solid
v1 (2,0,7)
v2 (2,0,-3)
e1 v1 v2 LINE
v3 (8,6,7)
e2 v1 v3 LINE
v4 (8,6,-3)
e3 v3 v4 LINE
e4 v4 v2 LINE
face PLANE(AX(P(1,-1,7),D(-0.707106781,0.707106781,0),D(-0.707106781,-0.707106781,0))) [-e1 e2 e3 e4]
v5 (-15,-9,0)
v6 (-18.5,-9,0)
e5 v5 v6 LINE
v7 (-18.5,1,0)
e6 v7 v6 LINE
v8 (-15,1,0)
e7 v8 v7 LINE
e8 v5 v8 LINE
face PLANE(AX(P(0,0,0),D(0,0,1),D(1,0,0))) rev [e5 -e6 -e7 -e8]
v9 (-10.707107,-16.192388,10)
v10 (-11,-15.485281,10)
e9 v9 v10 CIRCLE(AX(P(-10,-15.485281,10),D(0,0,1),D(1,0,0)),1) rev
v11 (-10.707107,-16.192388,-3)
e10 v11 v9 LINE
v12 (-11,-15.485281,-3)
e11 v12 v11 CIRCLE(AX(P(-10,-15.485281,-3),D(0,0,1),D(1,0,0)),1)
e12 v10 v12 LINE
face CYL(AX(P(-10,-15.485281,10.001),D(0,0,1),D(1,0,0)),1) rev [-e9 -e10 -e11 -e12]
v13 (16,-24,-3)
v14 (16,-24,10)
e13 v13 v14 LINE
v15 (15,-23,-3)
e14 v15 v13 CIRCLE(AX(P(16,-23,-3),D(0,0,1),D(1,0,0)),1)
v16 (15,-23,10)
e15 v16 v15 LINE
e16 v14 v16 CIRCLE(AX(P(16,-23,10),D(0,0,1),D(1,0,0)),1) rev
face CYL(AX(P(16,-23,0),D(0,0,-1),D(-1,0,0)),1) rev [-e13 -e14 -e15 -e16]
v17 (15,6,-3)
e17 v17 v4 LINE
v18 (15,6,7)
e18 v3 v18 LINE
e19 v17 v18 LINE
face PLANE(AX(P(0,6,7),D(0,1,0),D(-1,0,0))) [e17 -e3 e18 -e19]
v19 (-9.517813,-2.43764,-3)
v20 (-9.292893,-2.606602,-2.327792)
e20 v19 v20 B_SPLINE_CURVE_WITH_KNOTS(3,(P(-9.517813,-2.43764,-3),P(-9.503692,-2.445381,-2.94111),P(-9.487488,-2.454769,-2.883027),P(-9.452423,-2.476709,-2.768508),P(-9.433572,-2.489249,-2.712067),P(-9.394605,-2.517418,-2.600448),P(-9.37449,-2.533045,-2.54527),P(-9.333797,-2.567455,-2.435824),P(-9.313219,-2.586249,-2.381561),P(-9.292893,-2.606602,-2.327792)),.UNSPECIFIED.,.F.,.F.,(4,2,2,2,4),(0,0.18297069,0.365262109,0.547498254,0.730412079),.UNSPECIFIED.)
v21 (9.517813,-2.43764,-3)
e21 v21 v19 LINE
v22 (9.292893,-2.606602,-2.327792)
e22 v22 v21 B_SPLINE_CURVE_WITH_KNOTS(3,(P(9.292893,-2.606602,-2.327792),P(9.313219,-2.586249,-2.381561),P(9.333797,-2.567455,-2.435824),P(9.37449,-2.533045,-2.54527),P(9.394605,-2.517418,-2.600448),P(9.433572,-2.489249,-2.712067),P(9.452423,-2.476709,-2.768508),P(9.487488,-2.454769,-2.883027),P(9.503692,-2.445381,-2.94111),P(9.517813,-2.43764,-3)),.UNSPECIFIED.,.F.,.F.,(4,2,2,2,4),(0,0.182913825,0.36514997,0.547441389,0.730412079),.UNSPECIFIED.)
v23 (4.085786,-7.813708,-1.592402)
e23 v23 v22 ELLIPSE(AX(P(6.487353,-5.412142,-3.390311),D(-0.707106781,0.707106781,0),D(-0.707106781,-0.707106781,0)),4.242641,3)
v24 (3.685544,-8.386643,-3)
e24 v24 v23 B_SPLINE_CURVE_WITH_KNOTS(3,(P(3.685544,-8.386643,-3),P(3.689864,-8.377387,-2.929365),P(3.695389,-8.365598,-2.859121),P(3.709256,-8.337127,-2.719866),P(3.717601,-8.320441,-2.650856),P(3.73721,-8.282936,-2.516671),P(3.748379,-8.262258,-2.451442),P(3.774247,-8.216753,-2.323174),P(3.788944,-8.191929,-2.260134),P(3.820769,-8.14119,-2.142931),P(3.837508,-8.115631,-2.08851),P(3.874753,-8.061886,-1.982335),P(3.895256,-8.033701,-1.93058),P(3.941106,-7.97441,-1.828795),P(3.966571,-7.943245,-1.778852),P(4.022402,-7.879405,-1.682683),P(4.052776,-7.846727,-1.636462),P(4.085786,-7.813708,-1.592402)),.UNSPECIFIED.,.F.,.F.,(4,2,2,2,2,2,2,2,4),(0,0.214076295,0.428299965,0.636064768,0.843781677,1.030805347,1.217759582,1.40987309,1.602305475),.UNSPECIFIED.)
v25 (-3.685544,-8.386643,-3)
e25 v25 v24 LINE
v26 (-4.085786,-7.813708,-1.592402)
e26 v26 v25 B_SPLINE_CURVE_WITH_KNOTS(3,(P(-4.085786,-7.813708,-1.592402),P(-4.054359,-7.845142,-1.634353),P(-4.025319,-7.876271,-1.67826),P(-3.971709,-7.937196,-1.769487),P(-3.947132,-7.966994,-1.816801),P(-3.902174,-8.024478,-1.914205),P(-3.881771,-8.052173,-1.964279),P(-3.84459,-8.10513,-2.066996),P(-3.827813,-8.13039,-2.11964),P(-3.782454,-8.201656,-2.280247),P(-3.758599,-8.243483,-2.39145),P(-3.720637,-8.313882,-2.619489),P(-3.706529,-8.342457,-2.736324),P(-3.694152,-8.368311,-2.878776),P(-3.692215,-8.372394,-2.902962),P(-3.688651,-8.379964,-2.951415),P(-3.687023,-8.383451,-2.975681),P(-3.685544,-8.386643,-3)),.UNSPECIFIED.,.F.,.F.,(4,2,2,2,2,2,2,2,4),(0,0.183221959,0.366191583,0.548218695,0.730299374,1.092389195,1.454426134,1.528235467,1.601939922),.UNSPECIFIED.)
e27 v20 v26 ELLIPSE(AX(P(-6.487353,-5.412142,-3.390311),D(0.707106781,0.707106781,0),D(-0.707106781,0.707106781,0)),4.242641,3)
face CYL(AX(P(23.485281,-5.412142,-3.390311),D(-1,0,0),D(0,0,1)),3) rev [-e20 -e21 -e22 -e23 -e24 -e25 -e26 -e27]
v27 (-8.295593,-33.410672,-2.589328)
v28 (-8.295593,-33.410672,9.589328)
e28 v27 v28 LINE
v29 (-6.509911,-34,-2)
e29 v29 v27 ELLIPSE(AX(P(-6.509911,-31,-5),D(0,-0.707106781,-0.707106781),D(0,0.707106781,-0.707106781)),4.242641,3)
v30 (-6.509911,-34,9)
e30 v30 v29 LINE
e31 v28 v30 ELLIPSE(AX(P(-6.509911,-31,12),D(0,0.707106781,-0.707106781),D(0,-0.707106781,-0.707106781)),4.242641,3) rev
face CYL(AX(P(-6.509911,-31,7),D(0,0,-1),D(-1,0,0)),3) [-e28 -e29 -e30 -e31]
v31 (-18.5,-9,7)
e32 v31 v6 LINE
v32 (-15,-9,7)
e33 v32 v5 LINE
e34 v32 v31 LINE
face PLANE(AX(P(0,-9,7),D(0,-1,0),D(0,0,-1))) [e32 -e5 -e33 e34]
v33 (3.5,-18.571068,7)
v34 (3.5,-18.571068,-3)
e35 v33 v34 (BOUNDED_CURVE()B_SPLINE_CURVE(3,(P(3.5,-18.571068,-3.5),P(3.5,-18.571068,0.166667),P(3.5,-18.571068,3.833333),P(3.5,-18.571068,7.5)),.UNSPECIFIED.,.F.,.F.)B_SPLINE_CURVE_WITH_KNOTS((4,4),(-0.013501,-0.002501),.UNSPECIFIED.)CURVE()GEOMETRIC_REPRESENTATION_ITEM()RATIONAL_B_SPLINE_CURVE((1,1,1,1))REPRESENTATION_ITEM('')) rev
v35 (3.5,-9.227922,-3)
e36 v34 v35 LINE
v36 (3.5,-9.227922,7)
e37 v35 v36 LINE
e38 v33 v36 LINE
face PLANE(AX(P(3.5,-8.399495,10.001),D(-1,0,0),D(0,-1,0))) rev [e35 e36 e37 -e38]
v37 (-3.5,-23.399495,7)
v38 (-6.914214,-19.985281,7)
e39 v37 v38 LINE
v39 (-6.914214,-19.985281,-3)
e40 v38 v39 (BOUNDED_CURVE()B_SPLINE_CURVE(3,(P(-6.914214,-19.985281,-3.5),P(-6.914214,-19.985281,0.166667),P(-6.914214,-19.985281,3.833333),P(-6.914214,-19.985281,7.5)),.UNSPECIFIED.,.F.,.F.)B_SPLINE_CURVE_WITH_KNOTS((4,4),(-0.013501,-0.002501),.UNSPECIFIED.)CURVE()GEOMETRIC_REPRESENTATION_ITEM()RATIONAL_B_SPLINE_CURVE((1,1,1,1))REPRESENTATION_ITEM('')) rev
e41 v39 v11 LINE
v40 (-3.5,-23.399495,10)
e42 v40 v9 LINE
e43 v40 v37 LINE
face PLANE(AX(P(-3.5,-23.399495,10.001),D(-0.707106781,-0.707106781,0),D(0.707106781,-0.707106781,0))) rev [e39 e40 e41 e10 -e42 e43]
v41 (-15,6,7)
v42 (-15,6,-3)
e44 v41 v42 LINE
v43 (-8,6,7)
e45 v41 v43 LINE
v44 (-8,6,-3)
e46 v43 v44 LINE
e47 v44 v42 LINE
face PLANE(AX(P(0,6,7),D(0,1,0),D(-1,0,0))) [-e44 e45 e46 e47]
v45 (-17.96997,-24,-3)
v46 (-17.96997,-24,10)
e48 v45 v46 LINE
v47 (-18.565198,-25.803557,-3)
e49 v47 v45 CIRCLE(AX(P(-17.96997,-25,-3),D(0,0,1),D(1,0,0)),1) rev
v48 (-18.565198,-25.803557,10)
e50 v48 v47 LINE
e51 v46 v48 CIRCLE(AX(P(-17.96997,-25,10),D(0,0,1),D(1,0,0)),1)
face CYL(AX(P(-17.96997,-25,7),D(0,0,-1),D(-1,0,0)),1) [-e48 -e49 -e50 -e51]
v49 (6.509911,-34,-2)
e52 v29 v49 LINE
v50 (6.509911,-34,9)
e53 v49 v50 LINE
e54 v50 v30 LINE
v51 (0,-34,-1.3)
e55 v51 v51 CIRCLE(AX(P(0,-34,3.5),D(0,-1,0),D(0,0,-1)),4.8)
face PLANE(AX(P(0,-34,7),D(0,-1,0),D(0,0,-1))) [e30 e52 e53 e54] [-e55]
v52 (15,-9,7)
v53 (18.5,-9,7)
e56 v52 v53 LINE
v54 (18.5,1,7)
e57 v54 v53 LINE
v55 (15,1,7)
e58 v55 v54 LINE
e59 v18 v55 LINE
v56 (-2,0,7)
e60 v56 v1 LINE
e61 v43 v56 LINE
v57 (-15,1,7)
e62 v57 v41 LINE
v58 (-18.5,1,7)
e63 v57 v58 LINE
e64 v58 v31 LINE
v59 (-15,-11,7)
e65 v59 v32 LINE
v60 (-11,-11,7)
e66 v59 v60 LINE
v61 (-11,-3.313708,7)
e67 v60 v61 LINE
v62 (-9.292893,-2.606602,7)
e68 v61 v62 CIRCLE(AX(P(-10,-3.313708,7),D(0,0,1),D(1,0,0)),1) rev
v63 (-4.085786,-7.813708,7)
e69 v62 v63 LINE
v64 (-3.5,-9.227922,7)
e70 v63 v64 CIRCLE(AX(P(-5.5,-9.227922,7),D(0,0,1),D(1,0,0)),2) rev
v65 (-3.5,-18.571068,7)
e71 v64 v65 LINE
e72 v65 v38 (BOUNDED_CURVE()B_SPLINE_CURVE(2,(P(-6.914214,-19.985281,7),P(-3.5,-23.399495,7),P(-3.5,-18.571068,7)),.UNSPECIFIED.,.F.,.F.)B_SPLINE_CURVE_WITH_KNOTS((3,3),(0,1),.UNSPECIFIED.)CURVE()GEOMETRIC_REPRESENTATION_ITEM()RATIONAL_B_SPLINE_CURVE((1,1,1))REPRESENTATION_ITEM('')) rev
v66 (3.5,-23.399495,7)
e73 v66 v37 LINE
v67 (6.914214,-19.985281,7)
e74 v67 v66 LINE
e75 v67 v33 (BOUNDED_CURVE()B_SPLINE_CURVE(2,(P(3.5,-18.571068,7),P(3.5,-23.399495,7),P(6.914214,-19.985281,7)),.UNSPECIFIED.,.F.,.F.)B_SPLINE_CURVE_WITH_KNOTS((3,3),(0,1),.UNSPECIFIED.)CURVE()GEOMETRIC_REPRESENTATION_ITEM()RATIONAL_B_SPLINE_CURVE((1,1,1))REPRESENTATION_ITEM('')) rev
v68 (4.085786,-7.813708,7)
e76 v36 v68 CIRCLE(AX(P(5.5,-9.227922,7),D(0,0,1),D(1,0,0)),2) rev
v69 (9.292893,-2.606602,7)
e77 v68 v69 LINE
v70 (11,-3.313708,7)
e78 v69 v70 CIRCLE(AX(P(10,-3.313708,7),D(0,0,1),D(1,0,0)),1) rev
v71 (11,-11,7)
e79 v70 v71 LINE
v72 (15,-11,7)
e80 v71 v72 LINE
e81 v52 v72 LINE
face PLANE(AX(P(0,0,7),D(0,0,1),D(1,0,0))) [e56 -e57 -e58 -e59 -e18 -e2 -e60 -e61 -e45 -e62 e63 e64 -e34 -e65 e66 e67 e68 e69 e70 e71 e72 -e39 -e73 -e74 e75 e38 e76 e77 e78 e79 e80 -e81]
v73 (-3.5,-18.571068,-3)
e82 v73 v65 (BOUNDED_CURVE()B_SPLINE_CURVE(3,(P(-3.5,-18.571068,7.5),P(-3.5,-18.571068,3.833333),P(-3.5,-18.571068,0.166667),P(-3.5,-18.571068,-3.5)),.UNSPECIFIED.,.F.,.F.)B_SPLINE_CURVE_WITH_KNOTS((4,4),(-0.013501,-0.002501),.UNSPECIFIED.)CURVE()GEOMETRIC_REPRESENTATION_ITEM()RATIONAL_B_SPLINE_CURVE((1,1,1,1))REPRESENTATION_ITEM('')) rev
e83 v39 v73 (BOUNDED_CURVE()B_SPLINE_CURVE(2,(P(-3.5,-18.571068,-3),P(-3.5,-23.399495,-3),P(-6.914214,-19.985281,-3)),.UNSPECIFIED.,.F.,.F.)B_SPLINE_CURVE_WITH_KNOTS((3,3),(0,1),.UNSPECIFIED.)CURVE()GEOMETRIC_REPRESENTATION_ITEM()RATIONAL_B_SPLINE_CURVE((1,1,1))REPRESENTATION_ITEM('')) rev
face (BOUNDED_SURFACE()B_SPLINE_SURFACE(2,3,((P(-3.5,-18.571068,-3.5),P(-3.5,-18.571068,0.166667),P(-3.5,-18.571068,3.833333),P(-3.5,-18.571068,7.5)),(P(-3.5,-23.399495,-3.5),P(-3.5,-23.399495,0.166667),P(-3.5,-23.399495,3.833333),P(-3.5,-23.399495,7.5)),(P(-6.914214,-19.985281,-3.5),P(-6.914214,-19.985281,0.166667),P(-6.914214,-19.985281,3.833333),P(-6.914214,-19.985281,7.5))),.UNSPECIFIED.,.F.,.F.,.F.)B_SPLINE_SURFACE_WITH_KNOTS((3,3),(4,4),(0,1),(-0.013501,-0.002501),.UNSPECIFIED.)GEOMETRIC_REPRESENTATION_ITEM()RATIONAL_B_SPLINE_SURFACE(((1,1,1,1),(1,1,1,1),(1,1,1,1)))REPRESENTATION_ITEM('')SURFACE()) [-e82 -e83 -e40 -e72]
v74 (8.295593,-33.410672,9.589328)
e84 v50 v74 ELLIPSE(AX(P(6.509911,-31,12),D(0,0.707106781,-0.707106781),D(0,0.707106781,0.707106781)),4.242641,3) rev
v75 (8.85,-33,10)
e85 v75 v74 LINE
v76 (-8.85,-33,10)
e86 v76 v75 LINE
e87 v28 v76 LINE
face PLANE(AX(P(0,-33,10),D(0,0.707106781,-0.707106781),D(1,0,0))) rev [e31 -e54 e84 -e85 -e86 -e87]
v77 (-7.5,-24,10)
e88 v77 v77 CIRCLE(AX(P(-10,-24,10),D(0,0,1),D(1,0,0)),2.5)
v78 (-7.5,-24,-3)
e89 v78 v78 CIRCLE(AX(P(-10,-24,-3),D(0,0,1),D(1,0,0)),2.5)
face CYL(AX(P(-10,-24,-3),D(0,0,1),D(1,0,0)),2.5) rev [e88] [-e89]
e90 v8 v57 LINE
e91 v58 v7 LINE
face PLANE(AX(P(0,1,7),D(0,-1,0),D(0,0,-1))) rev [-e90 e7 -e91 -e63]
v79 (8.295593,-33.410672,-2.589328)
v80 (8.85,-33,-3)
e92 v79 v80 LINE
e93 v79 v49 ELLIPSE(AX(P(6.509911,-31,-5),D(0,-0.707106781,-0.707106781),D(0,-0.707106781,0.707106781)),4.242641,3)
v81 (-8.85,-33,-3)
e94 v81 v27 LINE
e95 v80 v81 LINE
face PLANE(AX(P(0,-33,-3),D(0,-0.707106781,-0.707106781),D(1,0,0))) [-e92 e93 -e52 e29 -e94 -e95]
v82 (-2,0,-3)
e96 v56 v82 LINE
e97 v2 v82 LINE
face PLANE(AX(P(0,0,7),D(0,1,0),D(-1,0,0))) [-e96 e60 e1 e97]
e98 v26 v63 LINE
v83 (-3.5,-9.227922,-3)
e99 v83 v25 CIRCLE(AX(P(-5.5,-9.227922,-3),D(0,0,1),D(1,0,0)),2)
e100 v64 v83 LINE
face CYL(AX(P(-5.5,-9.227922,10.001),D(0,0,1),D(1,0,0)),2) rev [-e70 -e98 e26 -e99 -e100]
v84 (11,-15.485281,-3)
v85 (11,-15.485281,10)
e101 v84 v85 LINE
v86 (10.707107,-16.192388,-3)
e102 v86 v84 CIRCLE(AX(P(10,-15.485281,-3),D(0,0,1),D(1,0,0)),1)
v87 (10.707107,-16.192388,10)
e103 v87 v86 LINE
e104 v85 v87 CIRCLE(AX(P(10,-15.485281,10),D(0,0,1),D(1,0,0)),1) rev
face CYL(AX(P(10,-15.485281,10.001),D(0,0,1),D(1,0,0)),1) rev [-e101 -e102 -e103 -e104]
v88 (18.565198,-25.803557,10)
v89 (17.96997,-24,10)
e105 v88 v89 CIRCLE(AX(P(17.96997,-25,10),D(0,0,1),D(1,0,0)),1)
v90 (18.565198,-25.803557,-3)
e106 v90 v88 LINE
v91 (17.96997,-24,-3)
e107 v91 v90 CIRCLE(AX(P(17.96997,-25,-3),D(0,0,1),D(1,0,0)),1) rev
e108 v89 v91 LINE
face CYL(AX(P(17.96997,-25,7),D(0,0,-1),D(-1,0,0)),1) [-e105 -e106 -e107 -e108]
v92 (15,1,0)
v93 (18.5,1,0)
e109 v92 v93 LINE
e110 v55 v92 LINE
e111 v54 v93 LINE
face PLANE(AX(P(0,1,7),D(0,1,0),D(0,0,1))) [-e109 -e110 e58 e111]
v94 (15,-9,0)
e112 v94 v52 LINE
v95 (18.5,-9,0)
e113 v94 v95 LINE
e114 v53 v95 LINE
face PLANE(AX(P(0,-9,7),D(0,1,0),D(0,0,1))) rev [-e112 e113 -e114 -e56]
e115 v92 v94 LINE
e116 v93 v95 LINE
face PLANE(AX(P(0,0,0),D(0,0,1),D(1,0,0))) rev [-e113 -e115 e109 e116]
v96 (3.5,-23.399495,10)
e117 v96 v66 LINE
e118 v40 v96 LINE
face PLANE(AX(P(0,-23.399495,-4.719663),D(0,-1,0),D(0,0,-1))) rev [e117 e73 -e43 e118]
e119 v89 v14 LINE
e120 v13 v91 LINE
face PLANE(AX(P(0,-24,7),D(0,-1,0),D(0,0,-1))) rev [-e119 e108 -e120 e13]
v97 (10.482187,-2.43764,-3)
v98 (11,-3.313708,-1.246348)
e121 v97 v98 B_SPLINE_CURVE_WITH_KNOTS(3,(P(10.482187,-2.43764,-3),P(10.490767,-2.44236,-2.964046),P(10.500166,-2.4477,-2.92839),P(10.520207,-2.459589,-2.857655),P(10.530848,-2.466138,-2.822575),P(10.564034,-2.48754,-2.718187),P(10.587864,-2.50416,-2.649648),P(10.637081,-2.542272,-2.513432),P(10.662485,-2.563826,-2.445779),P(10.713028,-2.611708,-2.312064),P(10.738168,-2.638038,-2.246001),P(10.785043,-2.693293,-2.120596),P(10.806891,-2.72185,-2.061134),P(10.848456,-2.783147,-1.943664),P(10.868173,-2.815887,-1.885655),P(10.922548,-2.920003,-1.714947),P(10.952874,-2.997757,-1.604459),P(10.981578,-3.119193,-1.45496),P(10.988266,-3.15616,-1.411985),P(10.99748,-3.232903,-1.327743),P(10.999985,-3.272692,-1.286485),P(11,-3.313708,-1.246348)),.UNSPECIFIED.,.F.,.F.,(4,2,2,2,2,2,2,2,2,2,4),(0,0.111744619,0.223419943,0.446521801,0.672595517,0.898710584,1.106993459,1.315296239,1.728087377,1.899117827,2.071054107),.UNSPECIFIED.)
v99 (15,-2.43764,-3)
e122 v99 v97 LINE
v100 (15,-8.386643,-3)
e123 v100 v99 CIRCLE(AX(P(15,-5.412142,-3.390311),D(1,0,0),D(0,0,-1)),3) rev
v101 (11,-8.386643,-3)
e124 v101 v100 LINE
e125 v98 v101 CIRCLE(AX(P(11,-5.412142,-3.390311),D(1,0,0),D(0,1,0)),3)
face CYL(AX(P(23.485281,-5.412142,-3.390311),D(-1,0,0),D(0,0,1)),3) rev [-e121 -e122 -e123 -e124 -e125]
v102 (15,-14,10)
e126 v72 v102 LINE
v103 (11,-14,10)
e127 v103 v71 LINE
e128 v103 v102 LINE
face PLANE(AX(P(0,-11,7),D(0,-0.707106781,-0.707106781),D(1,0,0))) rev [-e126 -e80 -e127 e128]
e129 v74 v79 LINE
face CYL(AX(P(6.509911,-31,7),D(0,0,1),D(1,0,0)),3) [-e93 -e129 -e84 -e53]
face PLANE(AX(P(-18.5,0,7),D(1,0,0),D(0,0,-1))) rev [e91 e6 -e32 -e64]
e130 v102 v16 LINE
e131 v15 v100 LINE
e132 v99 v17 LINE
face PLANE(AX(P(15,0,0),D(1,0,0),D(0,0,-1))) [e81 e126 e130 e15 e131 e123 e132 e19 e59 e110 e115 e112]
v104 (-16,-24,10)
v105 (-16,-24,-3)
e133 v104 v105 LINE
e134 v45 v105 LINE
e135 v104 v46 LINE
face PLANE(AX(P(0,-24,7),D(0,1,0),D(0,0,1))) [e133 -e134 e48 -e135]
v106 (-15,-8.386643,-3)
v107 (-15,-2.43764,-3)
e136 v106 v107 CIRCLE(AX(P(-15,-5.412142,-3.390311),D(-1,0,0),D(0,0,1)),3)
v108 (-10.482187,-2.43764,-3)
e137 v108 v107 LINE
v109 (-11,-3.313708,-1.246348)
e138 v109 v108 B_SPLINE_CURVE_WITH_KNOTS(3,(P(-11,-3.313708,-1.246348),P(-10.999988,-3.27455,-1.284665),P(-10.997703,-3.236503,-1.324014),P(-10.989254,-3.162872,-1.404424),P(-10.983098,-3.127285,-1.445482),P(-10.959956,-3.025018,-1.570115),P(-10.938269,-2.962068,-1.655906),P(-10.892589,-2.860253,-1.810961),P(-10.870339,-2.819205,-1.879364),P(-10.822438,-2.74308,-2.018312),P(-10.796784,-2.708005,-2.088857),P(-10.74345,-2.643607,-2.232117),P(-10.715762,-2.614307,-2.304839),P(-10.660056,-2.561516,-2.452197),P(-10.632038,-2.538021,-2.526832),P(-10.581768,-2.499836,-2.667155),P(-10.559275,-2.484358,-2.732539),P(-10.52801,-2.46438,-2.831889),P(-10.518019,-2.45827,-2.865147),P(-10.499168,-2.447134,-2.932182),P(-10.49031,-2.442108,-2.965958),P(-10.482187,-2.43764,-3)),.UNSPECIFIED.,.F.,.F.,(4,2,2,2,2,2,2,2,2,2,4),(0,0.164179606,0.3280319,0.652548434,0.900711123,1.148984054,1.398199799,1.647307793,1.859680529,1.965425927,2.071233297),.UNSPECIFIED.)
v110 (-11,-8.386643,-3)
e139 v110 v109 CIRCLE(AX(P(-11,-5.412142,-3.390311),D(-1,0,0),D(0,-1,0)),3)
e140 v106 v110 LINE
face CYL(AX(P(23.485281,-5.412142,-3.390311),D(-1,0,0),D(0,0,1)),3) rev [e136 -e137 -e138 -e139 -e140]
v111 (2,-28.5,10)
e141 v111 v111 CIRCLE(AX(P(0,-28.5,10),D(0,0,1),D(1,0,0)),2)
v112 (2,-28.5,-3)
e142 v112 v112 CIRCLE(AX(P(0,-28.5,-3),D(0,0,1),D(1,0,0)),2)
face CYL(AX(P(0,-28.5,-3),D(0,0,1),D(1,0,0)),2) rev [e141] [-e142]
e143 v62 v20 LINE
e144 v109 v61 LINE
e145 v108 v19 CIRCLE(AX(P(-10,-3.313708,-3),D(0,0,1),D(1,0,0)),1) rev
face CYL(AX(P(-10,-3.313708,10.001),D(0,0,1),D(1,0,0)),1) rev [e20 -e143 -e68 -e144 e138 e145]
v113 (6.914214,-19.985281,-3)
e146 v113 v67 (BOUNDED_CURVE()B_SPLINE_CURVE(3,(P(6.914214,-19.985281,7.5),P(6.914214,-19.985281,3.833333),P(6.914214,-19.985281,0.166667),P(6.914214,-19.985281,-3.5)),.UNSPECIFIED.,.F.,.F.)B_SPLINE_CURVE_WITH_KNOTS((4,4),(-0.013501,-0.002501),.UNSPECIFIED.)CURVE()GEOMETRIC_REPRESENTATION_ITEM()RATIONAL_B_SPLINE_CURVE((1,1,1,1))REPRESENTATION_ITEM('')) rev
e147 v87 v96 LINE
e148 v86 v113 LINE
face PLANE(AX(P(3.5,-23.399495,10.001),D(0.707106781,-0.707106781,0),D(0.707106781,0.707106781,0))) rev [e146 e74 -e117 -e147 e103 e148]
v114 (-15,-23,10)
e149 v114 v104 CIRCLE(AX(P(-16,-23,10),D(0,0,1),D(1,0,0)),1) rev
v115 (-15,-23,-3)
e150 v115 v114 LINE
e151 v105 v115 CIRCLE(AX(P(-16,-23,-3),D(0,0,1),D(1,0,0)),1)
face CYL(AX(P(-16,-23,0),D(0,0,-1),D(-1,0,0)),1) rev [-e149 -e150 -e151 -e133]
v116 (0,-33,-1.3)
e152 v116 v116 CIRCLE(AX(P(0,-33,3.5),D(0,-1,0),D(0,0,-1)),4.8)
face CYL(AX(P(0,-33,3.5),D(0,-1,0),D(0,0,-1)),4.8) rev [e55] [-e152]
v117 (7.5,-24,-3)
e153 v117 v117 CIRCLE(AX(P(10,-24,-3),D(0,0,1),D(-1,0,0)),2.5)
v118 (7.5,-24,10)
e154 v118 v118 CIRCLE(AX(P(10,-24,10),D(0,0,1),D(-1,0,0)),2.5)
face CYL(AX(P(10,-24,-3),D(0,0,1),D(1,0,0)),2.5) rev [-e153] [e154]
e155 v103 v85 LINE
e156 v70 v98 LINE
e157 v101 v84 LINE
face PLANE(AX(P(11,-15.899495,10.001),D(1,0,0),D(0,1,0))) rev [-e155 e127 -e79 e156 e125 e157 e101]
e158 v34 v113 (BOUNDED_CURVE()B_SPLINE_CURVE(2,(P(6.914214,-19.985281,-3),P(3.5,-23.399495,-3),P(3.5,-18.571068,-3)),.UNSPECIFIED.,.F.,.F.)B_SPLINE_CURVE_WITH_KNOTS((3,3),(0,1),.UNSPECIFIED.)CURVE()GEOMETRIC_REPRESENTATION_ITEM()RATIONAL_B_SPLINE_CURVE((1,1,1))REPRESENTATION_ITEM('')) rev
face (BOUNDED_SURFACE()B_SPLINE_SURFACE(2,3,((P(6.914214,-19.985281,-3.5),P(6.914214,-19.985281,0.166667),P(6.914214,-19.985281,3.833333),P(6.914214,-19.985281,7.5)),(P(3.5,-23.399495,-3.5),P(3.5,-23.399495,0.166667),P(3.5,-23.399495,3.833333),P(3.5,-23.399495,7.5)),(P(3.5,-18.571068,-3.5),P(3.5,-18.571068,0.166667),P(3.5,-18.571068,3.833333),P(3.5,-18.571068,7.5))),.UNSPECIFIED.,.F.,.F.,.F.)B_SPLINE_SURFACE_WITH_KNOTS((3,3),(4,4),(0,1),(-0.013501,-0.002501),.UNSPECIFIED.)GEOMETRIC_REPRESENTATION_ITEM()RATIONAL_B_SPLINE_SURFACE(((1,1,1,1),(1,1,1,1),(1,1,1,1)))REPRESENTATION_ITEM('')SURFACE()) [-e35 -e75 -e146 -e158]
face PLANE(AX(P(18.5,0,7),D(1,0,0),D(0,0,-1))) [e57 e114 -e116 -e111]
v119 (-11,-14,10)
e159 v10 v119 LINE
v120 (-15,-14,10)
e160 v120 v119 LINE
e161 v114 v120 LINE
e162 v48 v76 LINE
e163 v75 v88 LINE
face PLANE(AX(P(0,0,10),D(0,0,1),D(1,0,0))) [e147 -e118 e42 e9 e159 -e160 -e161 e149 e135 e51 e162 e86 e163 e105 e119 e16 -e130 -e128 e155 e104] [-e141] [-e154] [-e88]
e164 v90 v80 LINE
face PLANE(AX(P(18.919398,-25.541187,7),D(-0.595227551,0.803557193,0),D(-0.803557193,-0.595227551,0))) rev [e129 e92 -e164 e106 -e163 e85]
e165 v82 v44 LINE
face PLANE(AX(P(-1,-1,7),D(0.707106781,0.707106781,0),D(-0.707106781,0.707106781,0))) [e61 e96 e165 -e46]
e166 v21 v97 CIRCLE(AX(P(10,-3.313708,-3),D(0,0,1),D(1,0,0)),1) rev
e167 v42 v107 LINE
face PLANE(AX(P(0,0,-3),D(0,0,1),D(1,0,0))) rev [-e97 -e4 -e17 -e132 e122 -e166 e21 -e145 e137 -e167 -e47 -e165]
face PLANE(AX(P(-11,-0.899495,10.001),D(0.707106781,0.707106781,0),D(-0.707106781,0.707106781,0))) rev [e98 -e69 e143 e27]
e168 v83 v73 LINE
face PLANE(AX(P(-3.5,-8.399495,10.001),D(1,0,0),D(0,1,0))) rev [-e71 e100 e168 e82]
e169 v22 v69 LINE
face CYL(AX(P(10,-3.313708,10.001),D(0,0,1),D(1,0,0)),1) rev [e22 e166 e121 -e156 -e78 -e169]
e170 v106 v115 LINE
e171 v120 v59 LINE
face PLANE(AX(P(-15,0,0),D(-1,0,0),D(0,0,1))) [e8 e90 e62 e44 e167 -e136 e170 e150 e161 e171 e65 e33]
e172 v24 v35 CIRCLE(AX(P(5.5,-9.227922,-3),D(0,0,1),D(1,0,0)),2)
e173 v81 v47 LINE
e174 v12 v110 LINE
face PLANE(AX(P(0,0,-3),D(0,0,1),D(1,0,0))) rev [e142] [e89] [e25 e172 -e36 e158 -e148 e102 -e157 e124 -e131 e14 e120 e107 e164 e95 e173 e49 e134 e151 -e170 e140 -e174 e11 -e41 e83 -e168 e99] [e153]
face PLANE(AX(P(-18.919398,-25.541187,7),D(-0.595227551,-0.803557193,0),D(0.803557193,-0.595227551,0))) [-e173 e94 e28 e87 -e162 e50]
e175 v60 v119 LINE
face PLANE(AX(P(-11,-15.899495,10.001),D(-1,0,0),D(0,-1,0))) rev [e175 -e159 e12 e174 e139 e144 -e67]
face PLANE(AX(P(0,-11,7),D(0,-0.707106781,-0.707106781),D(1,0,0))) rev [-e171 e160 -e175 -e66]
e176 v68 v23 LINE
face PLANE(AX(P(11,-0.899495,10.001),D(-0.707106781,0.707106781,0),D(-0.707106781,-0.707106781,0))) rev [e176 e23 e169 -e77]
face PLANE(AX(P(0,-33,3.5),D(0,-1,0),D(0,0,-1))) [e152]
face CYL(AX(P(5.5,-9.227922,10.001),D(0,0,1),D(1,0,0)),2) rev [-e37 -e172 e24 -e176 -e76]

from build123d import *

# Parameters (mm, degrees)
ESQUISSE1_W             = 2.5
ESQUISSE1_H             = 10
BOSS_EXTRU_1_DEPTH      = 7
BOSS_EXTRU_2_DEPTH      = 3
BOSS_EXTRU_2_DEPTH_BACK = 10
ENL_V_MAT_EXTRU_1_REACH = 44.024
ESQUISSE4_4_W           = 7
ESQUISSE4_4_H           = 9.399494937
ENL_V_MAT_EXTRU_4_DEPTH = 3
ENL_V_START             = -13
ESQUISSE4_W             = 7
ESQUISSE4_H             = 9.399494937
ENL_V_MAT_EXTRU_2_DEPTH = 3
CHANFREIN1_SIZE         = 3
CONG_1_R                = 1
ESQUISSE5_R             = 4.8
ENL_V_MAT_EXTRU_5_DEPTH = 1
ESQUISSE6_R             = 2.5
ESQUISSE6_R_2           = 2
ENL_V_MAT_EXTRU_6_DEPTH = 42.047043387
CHANFREIN2_SIZE         = 1
SKETCH_1_W              = 7
SKETCH_1_H              = 5
CUT_EXTRUDE_1_DEPTH     = 1
SKETCH_2_W              = 7
SKETCH_2_H              = 5
CUT_EXTRUDE_2_DEPTH     = 1
EXTRUDE_1_DEPTH         = 3
FILLET_1_R              = 3
FILLET_2_R              = 1
FILLET_3_R              = 2
CUT_EXTRUDE_START       = -30
SKETCH_5_R              = 3
CUT_EXTRUDE_3_DEPTH     = 30


# Some blends are built 0.0001 mm under size
with BuildPart() as part:
    # Esquisse1 → Boss.-Extru.1 (new body)
    with BuildSketch(Plane.XY):
        Polygon((-8, 6), (-16, 6), (-16, 1), (-16, -9), (-16, -24), (-21, -24), (-7.5, -34), (0, -34), (0, 0), (-2, 0), align=None)
        Polygon((2, 0), (0, 0), (0, -34), (7.5, -34), (21, -24), (16, -24), (16, -9), (16, 1), (16, 6), (8, 6), align=None)
        with Locations((17.25, -4)):
            Rectangle(ESQUISSE1_W, ESQUISSE1_H)
        with Locations((-17.25, -4)):
            Rectangle(ESQUISSE1_W, ESQUISSE1_H)
    extrude(amount=BOSS_EXTRU_1_DEPTH)

    # Esquisse2 → Boss.-Extru.2 (add, two sides: drawn at the far end of the back side and taken through both)
    with BuildSketch(Plane.XY.offset(7).offset(-BOSS_EXTRU_2_DEPTH_BACK)):
        Polygon((16, -14), (-16, -14), (-16, -24), (-21, -24), (-7.5, -34), (7.5, -34), (21, -24), (16, -24), align=None)
    extrude(amount=BOSS_EXTRU_2_DEPTH + BOSS_EXTRU_2_DEPTH_BACK)

    # Esquisse3 → Enlèv. mat.-Extru.1 (cut, up to next)
    with BuildSketch(Plane(origin=(0, 0, -3), x_dir=(-1, 0, 0), z_dir=(0, 0, -1)), mode=Mode.PRIVATE) as enl_v_mat_extru_1_sk1:
        Polygon((-11, -0.899494937), (-3.5, -8.399494937), (-3.5, -23.399494937), (-11, -15.899494937), align=None)
    enl_v_mat_extru_1_tool1 = extrude(enl_v_mat_extru_1_sk1.sketch, amount=-ENL_V_MAT_EXTRU_1_REACH, mode=Mode.PRIVATE) & part.part
    # Esquisse3 → Enlèv. mat.-Extru.1 (cut, up to next)
    with BuildSketch(Plane(origin=(0, 0, -3), x_dir=(-1, 0, 0), z_dir=(0, 0, -1)), mode=Mode.PRIVATE) as enl_v_mat_extru_1_sk2:
        Polygon((11, -15.899494937), (11, -0.899494937), (3.5, -8.399494937), (3.5, -23.399494937), align=None)
    enl_v_mat_extru_1_tool2 = extrude(enl_v_mat_extru_1_sk2.sketch, amount=-ENL_V_MAT_EXTRU_1_REACH, mode=Mode.PRIVATE) & part.part
    add(enl_v_mat_extru_1_tool1.solids().sort_by_distance((7.25, -12.149495, -3))[0], mode=Mode.SUBTRACT)
    add(enl_v_mat_extru_1_tool2.solids().sort_by_distance((-7.25, -12.149495, -3))[0], mode=Mode.SUBTRACT)

    # Esquisse4<4> → Enlèv. mat.-Extru.4 (cut)
    with BuildSketch(Plane(origin=(0, 0, -3), x_dir=(-1, 0, 0), z_dir=(0, 0, -1))):
        with Locations((0, -18.699747469)):
            Rectangle(ESQUISSE4_4_W, ESQUISSE4_4_H)
    extrude(amount=-ENL_V_MAT_EXTRU_4_DEPTH, mode=Mode.SUBTRACT)

    # Esquisse4 → Enlèv. mat.-Extru.2 (cut)
    with BuildSketch(Plane(origin=(0, 0, -3), x_dir=(-1, 0, 0), z_dir=(0, 0, -1)).offset(ENL_V_START)):
        with Locations((0, -18.699747469)):
            Rectangle(ESQUISSE4_W, ESQUISSE4_H)
    extrude(amount=ENL_V_MAT_EXTRU_2_DEPTH, mode=Mode.SUBTRACT)

    # Chanfrein1
    chanfrein1_edges = [part.edges().sort_by_distance(p)[0] for p in [
        (-13.5, -14, 0),
        (-13.5, -14, 7),
        (13.5, -14, 0),
        (13.5, -14, 7),
    ]]
    chamfer(chanfrein1_edges, length=CHANFREIN1_SIZE - 0.0001)  # a hair under: the kernel refuses the full size

    # Congé1
    cong_1_edges = [part.edges().sort_by_distance(p)[0] for p in [
        (11, -15.899494937, 3.5),
        (11, -0.899494937, 3.5),
        (-11, -0.899494937, 3.5),
        (-11, -15.899494937, 3.5),
        (-21, -24, 3.5),
        (21, -24, 3.5),
    ]]
    fillet(cong_1_edges, radius=CONG_1_R)

    # Esquisse5 → Enlèv. mat.-Extru.5 (cut)
    with BuildSketch(Plane.XZ.offset(34)):
        with Locations(Location((0, 3.5, 0), (0, 0, 270))):
            Circle(ESQUISSE5_R)
    extrude(amount=-ENL_V_MAT_EXTRU_5_DEPTH, mode=Mode.SUBTRACT)

    # Esquisse6 → Enlèv. mat.-Extru.6 (cut, through all)
    with BuildSketch(Plane.XY.offset(10)):
        with Locations((-10, -24)):
            Circle(ESQUISSE6_R)
        with Locations((0, -28.5)):
            Circle(ESQUISSE6_R_2)
        with Locations(Location((10, -24, 0), (0, 0, 180))):
            Circle(ESQUISSE6_R)
    extrude(amount=-ENL_V_MAT_EXTRU_6_DEPTH, mode=Mode.SUBTRACT)

    # Chanfrein2
    chanfrein2_edges = [part.edges().sort_by_distance(p)[0] for p in [
        (0, -34, -3),
        (0, -34, 10),
    ]]
    chamfer(chanfrein2_edges, length=CHANFREIN2_SIZE)

    # Эскиз1 → Вырез-Вытянуть1 (cut)
    with BuildSketch(Plane(origin=(16, 0, 0), x_dir=(0, 0, -1), z_dir=(1, 0, 0))):
        with Locations((-3.5, 3.5)):
            Rectangle(SKETCH_1_W, SKETCH_1_H)
        Polygon((-10, -24), (3, -24), (3, -14), (0, -11), (0, -9), (-7, -9), (-7, -11), (-10, -14), align=None)
    extrude(amount=-CUT_EXTRUDE_1_DEPTH, mode=Mode.SUBTRACT)

    # Эскиз2 → Вырез-Вытянуть2 (cut)
    with BuildSketch(Plane.ZY.offset(16)):
        with Locations((3.5, 3.5)):
            Rectangle(SKETCH_2_W, SKETCH_2_H)
        Polygon((10, -24), (10, -14), (7, -11), (7, -9), (0, -9), (0, -11), (-3, -14), (-3, -24), align=None)
    extrude(amount=-CUT_EXTRUDE_2_DEPTH, mode=Mode.SUBTRACT)

    # Эскиз4 → Бобышка-Вытянуть1 (add)
    with BuildSketch(Plane(origin=(0, 0, 0), x_dir=(-1, 0, 0), z_dir=(0, 0, -1))):
        with BuildLine():
            Line((15, -14), (15, -11))
            Line((15, -11), (15, -9))
            Line((15, -9), (15, 6))
            Line((15, 6), (8, 6))
            Line((8, 6), (2, 0))
            Line((2, 0), (-2, 0))
            Line((-2, 0), (-8, 6))
            Line((-8, 6), (-15, 6))
            Line((-15, 6), (-15, -9))
            Line((-15, -9), (-15, -11))
            Line((-15, -11), (-15, -14))
            Line((-15, -14), (-11, -14))
            Line((-11, -14), (-11, -11))
            Line((-11, -11), (-11, -3.313708499))
            ThreePointArc((-11, -3.313708499), (-10.382683432, -2.389828966), (-9.292893219, -2.606601718))
            Line((-9.292893219, -2.606601718), (-3.5, -8.399494937))
            Line((-3.5, -8.399494937), (-3.5, -23.399494937))
            Line((-3.5, -23.399494937), (3.5, -23.399494937))
            Line((3.5, -23.399494937), (3.5, -8.399494937))
            Line((3.5, -8.399494937), (9.292893219, -2.606601718))
            ThreePointArc((9.292893219, -2.606601718), (10.382683432, -2.389828966), (11, -3.313708499))
            Line((11, -3.313708499), (11, -11))
            Line((11, -11), (11, -14))
            Line((11, -14), (15, -14))
        make_face()
    extrude(amount=EXTRUDE_1_DEPTH)

    # Скругление1
    fillet_1_edges = [part.edges().sort_by_distance(p)[0] for p in [
        (-7.5, -34, 3.5),
        (7.5, -34, 3.5),
    ]]
    fillet(fillet_1_edges, radius=FILLET_1_R)

    # Скругление2
    fillet_2_edges = [part.edges().sort_by_distance(p)[0] for p in [
        (15, -24, 3.5),
        (-15, -24, 3.5),
    ]]
    fillet(fillet_2_edges, radius=FILLET_2_R)

    # Скругление3
    fillet_3_edges = [part.edges().sort_by_distance(p)[0] for p in [
        (3.5, -8.399494937, 2),
        (-3.5, -8.399494937, 2),
    ]]
    fillet(fillet_3_edges, radius=FILLET_3_R)

    # Скругление4
    # a fillet whose section is not a circle: 2 mm, written as the material it adds along each edge
    with BuildSketch(Plane(origin=(-3.5, -23.399494937, 7), x_dir=(0, 1, 0), z_dir=(0, 0, -1)), Plane(origin=(3.5, -23.399494937, -3), x_dir=(0, 1, 0), z_dir=(0, 0, 1))) as fillet_4_piece_1:
        with BuildLine():
            Bezier((4.828427125, 0), (0, 0), (3.414213562, -3.414213562), weights=[1, 1, 1])
            Line((3.414213562, -3.414213562), (0, 0))
            Line((0, 0), (4.828427125, 0))
        make_face()
    extrude(amount=10)

    # Эскиз5 → Вырез-Вытянуть3 (cut)
    with BuildSketch(Plane.ZY.offset(15).offset(CUT_EXTRUDE_START)):
        with Locations((-3.39031082, -5.412141647)):
            Circle(SKETCH_5_R)
    extrude(amount=CUT_EXTRUDE_3_DEPTH, mode=Mode.SUBTRACT)


solid = part.part
